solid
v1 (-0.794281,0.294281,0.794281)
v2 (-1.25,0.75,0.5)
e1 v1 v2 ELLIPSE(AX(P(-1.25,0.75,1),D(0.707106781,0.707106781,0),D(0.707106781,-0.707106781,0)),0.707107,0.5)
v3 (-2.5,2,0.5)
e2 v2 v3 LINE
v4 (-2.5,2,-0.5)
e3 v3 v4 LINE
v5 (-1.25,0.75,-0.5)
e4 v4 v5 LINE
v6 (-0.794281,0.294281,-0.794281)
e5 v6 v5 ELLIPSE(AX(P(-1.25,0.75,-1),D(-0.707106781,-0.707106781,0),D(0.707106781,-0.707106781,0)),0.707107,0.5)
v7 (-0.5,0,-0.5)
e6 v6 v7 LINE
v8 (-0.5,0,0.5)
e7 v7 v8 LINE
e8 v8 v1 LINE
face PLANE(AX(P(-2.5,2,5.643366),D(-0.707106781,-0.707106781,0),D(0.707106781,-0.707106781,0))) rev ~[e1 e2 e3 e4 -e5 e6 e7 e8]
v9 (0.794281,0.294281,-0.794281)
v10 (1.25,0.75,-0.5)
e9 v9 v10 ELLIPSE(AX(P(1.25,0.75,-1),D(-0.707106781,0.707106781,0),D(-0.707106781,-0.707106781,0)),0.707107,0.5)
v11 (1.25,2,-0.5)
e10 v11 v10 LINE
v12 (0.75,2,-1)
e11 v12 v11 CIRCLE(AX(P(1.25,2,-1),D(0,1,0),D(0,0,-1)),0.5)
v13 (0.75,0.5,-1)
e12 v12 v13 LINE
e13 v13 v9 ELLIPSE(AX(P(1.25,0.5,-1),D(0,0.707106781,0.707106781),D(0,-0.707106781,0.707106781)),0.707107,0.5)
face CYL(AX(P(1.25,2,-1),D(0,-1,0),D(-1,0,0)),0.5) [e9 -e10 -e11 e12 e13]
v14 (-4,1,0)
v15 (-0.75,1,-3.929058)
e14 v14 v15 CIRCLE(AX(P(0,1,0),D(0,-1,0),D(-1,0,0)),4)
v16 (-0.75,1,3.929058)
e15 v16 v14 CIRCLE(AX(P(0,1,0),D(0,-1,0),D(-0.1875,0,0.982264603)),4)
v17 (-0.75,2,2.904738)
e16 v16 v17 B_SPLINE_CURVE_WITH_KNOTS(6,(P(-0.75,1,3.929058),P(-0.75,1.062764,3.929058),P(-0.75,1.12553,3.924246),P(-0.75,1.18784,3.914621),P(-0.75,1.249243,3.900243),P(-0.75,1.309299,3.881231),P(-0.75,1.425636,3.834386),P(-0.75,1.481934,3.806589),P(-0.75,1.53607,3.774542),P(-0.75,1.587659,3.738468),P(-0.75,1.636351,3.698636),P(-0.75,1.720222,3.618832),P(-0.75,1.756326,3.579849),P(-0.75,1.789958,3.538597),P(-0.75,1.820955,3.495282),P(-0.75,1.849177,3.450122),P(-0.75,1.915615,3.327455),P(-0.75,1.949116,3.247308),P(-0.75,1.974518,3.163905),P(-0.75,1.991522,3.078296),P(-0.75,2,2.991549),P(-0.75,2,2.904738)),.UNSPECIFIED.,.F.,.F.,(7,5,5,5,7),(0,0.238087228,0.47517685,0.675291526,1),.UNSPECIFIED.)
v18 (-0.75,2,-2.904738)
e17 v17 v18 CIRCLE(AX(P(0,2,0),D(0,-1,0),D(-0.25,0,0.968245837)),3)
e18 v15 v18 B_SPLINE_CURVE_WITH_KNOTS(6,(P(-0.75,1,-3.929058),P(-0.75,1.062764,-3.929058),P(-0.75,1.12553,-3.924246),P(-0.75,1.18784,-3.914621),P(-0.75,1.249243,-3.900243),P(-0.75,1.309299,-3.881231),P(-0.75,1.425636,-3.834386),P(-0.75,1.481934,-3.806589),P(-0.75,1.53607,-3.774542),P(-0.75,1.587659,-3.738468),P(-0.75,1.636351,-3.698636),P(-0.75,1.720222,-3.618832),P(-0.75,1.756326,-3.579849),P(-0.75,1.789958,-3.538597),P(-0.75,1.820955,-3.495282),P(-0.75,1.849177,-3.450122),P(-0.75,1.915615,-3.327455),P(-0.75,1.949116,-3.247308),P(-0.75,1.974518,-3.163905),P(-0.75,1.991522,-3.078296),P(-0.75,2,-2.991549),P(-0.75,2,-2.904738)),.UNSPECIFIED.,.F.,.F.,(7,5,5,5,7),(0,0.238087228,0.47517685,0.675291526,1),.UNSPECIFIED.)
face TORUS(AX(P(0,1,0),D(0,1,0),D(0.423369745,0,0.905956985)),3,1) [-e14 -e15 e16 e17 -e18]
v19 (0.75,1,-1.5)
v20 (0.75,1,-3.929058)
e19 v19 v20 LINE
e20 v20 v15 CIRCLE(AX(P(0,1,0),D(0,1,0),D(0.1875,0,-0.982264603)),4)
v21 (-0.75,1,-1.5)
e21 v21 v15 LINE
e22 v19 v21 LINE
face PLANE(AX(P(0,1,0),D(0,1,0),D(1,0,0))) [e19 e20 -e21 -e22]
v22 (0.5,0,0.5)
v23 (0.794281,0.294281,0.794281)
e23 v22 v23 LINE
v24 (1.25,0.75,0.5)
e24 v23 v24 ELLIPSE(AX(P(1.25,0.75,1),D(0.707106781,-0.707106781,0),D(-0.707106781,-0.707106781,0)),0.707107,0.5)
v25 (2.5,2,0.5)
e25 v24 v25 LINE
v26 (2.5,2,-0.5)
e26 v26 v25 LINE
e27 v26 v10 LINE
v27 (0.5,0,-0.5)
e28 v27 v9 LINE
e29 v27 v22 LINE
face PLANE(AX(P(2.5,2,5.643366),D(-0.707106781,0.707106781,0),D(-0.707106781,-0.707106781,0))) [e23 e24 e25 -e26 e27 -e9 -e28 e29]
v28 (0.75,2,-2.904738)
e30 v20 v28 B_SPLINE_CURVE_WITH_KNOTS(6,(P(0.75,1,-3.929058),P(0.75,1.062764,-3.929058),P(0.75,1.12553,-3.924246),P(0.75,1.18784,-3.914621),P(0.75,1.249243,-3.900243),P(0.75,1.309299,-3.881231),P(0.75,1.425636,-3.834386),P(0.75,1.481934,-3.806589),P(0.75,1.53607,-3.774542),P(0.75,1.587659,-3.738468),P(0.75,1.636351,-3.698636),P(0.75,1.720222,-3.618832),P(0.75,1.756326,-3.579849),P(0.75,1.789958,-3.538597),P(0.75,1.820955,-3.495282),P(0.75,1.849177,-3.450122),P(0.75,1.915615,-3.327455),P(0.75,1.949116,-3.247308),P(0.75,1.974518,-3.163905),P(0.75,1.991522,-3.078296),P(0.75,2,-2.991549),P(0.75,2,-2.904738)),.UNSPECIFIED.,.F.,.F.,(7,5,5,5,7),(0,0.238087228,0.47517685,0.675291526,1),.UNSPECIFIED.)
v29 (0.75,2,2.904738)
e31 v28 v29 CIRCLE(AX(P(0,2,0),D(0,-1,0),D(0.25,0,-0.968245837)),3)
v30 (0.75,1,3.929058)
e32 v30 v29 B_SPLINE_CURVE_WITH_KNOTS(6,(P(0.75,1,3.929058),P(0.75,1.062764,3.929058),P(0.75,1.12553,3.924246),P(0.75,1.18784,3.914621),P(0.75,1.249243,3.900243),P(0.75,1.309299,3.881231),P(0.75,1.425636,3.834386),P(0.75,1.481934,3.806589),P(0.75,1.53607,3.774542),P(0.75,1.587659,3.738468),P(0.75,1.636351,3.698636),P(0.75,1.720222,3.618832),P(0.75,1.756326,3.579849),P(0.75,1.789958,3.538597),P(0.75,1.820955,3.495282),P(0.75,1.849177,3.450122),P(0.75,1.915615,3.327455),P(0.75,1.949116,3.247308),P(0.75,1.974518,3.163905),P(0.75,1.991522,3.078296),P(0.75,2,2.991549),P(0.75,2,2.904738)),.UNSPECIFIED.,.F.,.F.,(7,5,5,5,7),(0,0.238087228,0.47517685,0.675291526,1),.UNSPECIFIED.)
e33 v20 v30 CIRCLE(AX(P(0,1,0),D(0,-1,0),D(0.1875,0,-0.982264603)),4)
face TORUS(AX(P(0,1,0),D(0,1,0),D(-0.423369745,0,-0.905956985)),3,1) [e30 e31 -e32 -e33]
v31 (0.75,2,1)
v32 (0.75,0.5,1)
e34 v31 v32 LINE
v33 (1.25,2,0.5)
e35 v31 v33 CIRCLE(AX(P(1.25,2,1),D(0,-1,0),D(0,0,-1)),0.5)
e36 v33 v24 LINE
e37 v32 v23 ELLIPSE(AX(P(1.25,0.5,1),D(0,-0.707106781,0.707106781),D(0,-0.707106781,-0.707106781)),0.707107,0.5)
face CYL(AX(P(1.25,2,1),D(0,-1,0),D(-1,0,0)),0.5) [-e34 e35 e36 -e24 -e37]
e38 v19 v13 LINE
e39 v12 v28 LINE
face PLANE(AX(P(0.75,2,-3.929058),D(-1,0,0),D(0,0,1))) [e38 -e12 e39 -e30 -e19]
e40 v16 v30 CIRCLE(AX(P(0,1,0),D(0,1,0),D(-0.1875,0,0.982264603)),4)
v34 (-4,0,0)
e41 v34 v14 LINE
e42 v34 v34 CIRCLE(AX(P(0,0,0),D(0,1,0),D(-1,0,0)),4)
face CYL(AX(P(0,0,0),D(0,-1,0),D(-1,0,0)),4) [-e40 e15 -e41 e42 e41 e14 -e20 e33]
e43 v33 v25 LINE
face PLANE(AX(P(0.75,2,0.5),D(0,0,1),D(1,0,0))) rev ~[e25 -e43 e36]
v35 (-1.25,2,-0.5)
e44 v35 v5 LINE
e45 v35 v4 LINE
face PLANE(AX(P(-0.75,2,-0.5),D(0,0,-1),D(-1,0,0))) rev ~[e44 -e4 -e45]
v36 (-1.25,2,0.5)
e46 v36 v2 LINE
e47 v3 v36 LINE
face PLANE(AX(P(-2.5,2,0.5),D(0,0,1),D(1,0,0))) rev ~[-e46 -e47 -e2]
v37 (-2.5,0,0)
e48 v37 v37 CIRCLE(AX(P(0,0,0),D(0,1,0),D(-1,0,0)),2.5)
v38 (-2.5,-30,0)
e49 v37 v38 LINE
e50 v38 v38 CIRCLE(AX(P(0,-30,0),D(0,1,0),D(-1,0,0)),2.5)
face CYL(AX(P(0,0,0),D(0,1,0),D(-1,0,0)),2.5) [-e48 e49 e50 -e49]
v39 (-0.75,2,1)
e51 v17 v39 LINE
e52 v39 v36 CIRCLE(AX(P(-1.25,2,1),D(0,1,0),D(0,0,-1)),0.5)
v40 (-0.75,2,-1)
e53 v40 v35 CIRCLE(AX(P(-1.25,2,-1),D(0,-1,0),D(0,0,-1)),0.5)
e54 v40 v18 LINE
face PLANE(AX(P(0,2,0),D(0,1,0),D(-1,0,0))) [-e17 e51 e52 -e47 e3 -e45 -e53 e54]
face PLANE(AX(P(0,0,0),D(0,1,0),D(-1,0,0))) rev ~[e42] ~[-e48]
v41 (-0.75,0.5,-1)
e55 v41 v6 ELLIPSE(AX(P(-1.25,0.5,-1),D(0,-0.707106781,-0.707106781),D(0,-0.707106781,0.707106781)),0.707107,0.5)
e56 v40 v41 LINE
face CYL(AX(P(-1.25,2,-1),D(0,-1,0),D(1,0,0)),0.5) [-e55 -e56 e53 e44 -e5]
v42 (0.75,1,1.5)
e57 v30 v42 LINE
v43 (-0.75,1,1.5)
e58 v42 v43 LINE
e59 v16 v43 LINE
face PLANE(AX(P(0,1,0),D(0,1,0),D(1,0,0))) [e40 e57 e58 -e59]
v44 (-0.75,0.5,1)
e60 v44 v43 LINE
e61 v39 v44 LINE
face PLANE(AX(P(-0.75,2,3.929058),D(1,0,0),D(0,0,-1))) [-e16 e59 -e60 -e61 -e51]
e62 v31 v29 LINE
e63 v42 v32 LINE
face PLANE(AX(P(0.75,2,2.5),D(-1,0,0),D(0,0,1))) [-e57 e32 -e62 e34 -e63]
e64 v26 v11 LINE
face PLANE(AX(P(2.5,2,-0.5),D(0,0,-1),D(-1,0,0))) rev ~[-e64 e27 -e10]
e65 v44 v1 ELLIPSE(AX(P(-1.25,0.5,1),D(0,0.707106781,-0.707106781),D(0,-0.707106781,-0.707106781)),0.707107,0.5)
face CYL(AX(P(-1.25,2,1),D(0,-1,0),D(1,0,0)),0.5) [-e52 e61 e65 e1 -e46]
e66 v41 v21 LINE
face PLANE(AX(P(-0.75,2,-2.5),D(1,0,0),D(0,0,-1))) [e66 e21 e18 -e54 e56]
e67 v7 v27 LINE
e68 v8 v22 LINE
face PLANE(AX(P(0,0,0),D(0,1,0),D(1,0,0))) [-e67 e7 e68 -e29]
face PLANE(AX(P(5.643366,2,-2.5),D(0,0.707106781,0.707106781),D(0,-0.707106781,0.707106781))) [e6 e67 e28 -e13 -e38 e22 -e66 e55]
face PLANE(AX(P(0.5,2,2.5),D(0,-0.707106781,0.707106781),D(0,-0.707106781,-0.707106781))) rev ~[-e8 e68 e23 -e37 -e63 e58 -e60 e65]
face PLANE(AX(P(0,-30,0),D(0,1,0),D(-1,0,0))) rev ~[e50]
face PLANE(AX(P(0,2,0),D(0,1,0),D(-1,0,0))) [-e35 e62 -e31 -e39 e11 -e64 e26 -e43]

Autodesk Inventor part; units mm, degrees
ref_plane "YZ Plane" through (0, 0, 0) normal (1, 0, 0) x (0, 1, 0)
ref_plane "XZ Plane" through (0, 0, 0) normal (0, 1, 0) x (-1, 0, 0)
ref_plane "XY Plane" through (0, 0, 0) normal (0, 0, 1) x (1, 0, 0)
sketch "Sketch1" plane through (0, 0, 0) normal (0, 1, 0) x (-1, 0, 0)
  circle A0 centre (0, 0) radius 2.5
  circle A1 centre (0, 0) radius 4
  dimension "d228" = 5
  dimension "d229" = 8
extrude "Extrusion1" add sketch "Sketch1" against normal blind 30 contours A0
extrude "Extrusion2" add sketch "Sketch1" along normal blind 2 contours A0 | A1
fillet "Fillet1" radius 0.5 1 edges at (4, 2, 0)
sketch "Sketch2" plane through (0, 2, 0) normal (0, 1, 0) x (1, 0, 0)
  line L0 (0.75, -4) -> (-0.75, -4)
  line L1 (-0.75, -4) -> (-0.75, 4)
  line L2 (-0.75, 4) -> (0.75, 4)
  line L3 (0.75, 4) -> (0.75, -4)
  circle A0 centre (0, 0) radius 4 projected
  line L4 (0, -4) -> (0, 4)
  line L5 (-2.5, -0.5) -> (2.5, -0.5)
  line L6 (2.5, -0.5) -> (2.5, 0.5)
  line L7 (2.5, 0.5) -> (-2.5, 0.5)
  line L8 (-2.5, 0.5) -> (-2.5, -0.5)
  line L9 (-4, 0) -> (4, 0)
  line L10 (-0.75, -2.5) -> (0.75, -2.5)
  line L11 (0.75, -2.5) -> (0.75, 2.5)
  line L12 (0.75, 2.5) -> (-0.75, 2.5)
  line L13 (-0.75, 2.5) -> (-0.75, -2.5)
  line L14 (-0.5, 0.5) -> (0.5, 0.5)
  line L15 (0.5, 0.5) -> (0.5, -0.5)
  line L16 (0.5, -0.5) -> (-0.5, -0.5)
  line L17 (-0.5, -0.5) -> (-0.5, 0.5)
  point P0 (-0.75, -3.9291)
  point P1 (0.75, -3.9291)
  point P2 (0.75, 3.9291)
  point P3 (-0.75, 3.9291)
  point P4 (0.75, 0.5)
  point P5 (-0.75, 0.5)
  point P6 (-0.75, -0.5)
  point P7 (0.75, -0.5)
  dimension "d234" = 8
  dimension "d235" = 1.5
  dimension "d236" = 1
  dimension "d237" = 5
  dimension "d238" = 5
  dimension "d243" = 1
  dimension "d244" = 1
extrude "Extrusion3" cut sketch "Sketch2" against normal blind 2 contours L5 L17 L9 L4 | L4 L9 L15 L5 | L9 L17 L7 L4 | L4 L7 L15 L9
chamfer "Chamfer1" distance 2 angle 45 4 edges at (-0.5, 2, 0) (0.5, 2, 0) (0, 2, 0.5) (0, 2, -0.5)
extrude "Extrusion4" cut sketch "Sketch2" against normal blind 1 contours L4 L10 L3 A0 | A0 L1 L10 L4 | L10 L1 L5 L4 | L4 L5 L3 L10 | L3 L12 L4 A0 | A0 L4 L12 L1 | L3 L7 L4 L12 | L12 L4 L7 L1
extrude "Extrusion5" add sketch "Sketch2" against normal blind 2 contours L3 L5 L6 L9 A0 | A0 L9 L8 L5 L1 | L9 L6 L7 L3 A0 | A0 L1 L7 L8 L9
thread "Thread1" size "M5x0.8" class "6g" standard "ANSI Metric M Profile" full length
fillet "Fillet2" radius 1 2 edges at (4, 2, 0) (-4, 2, 0)
fillet "Fillet3" radius 0.5 4 edges at (-0.75, 1.125, -0.5) (0.75, 1.125, -0.5) (-0.75, 1.125, 0.5) (0.75, 1.125, 0.5)
properties part number "Langbektang houder" material "Steel, Mild"
